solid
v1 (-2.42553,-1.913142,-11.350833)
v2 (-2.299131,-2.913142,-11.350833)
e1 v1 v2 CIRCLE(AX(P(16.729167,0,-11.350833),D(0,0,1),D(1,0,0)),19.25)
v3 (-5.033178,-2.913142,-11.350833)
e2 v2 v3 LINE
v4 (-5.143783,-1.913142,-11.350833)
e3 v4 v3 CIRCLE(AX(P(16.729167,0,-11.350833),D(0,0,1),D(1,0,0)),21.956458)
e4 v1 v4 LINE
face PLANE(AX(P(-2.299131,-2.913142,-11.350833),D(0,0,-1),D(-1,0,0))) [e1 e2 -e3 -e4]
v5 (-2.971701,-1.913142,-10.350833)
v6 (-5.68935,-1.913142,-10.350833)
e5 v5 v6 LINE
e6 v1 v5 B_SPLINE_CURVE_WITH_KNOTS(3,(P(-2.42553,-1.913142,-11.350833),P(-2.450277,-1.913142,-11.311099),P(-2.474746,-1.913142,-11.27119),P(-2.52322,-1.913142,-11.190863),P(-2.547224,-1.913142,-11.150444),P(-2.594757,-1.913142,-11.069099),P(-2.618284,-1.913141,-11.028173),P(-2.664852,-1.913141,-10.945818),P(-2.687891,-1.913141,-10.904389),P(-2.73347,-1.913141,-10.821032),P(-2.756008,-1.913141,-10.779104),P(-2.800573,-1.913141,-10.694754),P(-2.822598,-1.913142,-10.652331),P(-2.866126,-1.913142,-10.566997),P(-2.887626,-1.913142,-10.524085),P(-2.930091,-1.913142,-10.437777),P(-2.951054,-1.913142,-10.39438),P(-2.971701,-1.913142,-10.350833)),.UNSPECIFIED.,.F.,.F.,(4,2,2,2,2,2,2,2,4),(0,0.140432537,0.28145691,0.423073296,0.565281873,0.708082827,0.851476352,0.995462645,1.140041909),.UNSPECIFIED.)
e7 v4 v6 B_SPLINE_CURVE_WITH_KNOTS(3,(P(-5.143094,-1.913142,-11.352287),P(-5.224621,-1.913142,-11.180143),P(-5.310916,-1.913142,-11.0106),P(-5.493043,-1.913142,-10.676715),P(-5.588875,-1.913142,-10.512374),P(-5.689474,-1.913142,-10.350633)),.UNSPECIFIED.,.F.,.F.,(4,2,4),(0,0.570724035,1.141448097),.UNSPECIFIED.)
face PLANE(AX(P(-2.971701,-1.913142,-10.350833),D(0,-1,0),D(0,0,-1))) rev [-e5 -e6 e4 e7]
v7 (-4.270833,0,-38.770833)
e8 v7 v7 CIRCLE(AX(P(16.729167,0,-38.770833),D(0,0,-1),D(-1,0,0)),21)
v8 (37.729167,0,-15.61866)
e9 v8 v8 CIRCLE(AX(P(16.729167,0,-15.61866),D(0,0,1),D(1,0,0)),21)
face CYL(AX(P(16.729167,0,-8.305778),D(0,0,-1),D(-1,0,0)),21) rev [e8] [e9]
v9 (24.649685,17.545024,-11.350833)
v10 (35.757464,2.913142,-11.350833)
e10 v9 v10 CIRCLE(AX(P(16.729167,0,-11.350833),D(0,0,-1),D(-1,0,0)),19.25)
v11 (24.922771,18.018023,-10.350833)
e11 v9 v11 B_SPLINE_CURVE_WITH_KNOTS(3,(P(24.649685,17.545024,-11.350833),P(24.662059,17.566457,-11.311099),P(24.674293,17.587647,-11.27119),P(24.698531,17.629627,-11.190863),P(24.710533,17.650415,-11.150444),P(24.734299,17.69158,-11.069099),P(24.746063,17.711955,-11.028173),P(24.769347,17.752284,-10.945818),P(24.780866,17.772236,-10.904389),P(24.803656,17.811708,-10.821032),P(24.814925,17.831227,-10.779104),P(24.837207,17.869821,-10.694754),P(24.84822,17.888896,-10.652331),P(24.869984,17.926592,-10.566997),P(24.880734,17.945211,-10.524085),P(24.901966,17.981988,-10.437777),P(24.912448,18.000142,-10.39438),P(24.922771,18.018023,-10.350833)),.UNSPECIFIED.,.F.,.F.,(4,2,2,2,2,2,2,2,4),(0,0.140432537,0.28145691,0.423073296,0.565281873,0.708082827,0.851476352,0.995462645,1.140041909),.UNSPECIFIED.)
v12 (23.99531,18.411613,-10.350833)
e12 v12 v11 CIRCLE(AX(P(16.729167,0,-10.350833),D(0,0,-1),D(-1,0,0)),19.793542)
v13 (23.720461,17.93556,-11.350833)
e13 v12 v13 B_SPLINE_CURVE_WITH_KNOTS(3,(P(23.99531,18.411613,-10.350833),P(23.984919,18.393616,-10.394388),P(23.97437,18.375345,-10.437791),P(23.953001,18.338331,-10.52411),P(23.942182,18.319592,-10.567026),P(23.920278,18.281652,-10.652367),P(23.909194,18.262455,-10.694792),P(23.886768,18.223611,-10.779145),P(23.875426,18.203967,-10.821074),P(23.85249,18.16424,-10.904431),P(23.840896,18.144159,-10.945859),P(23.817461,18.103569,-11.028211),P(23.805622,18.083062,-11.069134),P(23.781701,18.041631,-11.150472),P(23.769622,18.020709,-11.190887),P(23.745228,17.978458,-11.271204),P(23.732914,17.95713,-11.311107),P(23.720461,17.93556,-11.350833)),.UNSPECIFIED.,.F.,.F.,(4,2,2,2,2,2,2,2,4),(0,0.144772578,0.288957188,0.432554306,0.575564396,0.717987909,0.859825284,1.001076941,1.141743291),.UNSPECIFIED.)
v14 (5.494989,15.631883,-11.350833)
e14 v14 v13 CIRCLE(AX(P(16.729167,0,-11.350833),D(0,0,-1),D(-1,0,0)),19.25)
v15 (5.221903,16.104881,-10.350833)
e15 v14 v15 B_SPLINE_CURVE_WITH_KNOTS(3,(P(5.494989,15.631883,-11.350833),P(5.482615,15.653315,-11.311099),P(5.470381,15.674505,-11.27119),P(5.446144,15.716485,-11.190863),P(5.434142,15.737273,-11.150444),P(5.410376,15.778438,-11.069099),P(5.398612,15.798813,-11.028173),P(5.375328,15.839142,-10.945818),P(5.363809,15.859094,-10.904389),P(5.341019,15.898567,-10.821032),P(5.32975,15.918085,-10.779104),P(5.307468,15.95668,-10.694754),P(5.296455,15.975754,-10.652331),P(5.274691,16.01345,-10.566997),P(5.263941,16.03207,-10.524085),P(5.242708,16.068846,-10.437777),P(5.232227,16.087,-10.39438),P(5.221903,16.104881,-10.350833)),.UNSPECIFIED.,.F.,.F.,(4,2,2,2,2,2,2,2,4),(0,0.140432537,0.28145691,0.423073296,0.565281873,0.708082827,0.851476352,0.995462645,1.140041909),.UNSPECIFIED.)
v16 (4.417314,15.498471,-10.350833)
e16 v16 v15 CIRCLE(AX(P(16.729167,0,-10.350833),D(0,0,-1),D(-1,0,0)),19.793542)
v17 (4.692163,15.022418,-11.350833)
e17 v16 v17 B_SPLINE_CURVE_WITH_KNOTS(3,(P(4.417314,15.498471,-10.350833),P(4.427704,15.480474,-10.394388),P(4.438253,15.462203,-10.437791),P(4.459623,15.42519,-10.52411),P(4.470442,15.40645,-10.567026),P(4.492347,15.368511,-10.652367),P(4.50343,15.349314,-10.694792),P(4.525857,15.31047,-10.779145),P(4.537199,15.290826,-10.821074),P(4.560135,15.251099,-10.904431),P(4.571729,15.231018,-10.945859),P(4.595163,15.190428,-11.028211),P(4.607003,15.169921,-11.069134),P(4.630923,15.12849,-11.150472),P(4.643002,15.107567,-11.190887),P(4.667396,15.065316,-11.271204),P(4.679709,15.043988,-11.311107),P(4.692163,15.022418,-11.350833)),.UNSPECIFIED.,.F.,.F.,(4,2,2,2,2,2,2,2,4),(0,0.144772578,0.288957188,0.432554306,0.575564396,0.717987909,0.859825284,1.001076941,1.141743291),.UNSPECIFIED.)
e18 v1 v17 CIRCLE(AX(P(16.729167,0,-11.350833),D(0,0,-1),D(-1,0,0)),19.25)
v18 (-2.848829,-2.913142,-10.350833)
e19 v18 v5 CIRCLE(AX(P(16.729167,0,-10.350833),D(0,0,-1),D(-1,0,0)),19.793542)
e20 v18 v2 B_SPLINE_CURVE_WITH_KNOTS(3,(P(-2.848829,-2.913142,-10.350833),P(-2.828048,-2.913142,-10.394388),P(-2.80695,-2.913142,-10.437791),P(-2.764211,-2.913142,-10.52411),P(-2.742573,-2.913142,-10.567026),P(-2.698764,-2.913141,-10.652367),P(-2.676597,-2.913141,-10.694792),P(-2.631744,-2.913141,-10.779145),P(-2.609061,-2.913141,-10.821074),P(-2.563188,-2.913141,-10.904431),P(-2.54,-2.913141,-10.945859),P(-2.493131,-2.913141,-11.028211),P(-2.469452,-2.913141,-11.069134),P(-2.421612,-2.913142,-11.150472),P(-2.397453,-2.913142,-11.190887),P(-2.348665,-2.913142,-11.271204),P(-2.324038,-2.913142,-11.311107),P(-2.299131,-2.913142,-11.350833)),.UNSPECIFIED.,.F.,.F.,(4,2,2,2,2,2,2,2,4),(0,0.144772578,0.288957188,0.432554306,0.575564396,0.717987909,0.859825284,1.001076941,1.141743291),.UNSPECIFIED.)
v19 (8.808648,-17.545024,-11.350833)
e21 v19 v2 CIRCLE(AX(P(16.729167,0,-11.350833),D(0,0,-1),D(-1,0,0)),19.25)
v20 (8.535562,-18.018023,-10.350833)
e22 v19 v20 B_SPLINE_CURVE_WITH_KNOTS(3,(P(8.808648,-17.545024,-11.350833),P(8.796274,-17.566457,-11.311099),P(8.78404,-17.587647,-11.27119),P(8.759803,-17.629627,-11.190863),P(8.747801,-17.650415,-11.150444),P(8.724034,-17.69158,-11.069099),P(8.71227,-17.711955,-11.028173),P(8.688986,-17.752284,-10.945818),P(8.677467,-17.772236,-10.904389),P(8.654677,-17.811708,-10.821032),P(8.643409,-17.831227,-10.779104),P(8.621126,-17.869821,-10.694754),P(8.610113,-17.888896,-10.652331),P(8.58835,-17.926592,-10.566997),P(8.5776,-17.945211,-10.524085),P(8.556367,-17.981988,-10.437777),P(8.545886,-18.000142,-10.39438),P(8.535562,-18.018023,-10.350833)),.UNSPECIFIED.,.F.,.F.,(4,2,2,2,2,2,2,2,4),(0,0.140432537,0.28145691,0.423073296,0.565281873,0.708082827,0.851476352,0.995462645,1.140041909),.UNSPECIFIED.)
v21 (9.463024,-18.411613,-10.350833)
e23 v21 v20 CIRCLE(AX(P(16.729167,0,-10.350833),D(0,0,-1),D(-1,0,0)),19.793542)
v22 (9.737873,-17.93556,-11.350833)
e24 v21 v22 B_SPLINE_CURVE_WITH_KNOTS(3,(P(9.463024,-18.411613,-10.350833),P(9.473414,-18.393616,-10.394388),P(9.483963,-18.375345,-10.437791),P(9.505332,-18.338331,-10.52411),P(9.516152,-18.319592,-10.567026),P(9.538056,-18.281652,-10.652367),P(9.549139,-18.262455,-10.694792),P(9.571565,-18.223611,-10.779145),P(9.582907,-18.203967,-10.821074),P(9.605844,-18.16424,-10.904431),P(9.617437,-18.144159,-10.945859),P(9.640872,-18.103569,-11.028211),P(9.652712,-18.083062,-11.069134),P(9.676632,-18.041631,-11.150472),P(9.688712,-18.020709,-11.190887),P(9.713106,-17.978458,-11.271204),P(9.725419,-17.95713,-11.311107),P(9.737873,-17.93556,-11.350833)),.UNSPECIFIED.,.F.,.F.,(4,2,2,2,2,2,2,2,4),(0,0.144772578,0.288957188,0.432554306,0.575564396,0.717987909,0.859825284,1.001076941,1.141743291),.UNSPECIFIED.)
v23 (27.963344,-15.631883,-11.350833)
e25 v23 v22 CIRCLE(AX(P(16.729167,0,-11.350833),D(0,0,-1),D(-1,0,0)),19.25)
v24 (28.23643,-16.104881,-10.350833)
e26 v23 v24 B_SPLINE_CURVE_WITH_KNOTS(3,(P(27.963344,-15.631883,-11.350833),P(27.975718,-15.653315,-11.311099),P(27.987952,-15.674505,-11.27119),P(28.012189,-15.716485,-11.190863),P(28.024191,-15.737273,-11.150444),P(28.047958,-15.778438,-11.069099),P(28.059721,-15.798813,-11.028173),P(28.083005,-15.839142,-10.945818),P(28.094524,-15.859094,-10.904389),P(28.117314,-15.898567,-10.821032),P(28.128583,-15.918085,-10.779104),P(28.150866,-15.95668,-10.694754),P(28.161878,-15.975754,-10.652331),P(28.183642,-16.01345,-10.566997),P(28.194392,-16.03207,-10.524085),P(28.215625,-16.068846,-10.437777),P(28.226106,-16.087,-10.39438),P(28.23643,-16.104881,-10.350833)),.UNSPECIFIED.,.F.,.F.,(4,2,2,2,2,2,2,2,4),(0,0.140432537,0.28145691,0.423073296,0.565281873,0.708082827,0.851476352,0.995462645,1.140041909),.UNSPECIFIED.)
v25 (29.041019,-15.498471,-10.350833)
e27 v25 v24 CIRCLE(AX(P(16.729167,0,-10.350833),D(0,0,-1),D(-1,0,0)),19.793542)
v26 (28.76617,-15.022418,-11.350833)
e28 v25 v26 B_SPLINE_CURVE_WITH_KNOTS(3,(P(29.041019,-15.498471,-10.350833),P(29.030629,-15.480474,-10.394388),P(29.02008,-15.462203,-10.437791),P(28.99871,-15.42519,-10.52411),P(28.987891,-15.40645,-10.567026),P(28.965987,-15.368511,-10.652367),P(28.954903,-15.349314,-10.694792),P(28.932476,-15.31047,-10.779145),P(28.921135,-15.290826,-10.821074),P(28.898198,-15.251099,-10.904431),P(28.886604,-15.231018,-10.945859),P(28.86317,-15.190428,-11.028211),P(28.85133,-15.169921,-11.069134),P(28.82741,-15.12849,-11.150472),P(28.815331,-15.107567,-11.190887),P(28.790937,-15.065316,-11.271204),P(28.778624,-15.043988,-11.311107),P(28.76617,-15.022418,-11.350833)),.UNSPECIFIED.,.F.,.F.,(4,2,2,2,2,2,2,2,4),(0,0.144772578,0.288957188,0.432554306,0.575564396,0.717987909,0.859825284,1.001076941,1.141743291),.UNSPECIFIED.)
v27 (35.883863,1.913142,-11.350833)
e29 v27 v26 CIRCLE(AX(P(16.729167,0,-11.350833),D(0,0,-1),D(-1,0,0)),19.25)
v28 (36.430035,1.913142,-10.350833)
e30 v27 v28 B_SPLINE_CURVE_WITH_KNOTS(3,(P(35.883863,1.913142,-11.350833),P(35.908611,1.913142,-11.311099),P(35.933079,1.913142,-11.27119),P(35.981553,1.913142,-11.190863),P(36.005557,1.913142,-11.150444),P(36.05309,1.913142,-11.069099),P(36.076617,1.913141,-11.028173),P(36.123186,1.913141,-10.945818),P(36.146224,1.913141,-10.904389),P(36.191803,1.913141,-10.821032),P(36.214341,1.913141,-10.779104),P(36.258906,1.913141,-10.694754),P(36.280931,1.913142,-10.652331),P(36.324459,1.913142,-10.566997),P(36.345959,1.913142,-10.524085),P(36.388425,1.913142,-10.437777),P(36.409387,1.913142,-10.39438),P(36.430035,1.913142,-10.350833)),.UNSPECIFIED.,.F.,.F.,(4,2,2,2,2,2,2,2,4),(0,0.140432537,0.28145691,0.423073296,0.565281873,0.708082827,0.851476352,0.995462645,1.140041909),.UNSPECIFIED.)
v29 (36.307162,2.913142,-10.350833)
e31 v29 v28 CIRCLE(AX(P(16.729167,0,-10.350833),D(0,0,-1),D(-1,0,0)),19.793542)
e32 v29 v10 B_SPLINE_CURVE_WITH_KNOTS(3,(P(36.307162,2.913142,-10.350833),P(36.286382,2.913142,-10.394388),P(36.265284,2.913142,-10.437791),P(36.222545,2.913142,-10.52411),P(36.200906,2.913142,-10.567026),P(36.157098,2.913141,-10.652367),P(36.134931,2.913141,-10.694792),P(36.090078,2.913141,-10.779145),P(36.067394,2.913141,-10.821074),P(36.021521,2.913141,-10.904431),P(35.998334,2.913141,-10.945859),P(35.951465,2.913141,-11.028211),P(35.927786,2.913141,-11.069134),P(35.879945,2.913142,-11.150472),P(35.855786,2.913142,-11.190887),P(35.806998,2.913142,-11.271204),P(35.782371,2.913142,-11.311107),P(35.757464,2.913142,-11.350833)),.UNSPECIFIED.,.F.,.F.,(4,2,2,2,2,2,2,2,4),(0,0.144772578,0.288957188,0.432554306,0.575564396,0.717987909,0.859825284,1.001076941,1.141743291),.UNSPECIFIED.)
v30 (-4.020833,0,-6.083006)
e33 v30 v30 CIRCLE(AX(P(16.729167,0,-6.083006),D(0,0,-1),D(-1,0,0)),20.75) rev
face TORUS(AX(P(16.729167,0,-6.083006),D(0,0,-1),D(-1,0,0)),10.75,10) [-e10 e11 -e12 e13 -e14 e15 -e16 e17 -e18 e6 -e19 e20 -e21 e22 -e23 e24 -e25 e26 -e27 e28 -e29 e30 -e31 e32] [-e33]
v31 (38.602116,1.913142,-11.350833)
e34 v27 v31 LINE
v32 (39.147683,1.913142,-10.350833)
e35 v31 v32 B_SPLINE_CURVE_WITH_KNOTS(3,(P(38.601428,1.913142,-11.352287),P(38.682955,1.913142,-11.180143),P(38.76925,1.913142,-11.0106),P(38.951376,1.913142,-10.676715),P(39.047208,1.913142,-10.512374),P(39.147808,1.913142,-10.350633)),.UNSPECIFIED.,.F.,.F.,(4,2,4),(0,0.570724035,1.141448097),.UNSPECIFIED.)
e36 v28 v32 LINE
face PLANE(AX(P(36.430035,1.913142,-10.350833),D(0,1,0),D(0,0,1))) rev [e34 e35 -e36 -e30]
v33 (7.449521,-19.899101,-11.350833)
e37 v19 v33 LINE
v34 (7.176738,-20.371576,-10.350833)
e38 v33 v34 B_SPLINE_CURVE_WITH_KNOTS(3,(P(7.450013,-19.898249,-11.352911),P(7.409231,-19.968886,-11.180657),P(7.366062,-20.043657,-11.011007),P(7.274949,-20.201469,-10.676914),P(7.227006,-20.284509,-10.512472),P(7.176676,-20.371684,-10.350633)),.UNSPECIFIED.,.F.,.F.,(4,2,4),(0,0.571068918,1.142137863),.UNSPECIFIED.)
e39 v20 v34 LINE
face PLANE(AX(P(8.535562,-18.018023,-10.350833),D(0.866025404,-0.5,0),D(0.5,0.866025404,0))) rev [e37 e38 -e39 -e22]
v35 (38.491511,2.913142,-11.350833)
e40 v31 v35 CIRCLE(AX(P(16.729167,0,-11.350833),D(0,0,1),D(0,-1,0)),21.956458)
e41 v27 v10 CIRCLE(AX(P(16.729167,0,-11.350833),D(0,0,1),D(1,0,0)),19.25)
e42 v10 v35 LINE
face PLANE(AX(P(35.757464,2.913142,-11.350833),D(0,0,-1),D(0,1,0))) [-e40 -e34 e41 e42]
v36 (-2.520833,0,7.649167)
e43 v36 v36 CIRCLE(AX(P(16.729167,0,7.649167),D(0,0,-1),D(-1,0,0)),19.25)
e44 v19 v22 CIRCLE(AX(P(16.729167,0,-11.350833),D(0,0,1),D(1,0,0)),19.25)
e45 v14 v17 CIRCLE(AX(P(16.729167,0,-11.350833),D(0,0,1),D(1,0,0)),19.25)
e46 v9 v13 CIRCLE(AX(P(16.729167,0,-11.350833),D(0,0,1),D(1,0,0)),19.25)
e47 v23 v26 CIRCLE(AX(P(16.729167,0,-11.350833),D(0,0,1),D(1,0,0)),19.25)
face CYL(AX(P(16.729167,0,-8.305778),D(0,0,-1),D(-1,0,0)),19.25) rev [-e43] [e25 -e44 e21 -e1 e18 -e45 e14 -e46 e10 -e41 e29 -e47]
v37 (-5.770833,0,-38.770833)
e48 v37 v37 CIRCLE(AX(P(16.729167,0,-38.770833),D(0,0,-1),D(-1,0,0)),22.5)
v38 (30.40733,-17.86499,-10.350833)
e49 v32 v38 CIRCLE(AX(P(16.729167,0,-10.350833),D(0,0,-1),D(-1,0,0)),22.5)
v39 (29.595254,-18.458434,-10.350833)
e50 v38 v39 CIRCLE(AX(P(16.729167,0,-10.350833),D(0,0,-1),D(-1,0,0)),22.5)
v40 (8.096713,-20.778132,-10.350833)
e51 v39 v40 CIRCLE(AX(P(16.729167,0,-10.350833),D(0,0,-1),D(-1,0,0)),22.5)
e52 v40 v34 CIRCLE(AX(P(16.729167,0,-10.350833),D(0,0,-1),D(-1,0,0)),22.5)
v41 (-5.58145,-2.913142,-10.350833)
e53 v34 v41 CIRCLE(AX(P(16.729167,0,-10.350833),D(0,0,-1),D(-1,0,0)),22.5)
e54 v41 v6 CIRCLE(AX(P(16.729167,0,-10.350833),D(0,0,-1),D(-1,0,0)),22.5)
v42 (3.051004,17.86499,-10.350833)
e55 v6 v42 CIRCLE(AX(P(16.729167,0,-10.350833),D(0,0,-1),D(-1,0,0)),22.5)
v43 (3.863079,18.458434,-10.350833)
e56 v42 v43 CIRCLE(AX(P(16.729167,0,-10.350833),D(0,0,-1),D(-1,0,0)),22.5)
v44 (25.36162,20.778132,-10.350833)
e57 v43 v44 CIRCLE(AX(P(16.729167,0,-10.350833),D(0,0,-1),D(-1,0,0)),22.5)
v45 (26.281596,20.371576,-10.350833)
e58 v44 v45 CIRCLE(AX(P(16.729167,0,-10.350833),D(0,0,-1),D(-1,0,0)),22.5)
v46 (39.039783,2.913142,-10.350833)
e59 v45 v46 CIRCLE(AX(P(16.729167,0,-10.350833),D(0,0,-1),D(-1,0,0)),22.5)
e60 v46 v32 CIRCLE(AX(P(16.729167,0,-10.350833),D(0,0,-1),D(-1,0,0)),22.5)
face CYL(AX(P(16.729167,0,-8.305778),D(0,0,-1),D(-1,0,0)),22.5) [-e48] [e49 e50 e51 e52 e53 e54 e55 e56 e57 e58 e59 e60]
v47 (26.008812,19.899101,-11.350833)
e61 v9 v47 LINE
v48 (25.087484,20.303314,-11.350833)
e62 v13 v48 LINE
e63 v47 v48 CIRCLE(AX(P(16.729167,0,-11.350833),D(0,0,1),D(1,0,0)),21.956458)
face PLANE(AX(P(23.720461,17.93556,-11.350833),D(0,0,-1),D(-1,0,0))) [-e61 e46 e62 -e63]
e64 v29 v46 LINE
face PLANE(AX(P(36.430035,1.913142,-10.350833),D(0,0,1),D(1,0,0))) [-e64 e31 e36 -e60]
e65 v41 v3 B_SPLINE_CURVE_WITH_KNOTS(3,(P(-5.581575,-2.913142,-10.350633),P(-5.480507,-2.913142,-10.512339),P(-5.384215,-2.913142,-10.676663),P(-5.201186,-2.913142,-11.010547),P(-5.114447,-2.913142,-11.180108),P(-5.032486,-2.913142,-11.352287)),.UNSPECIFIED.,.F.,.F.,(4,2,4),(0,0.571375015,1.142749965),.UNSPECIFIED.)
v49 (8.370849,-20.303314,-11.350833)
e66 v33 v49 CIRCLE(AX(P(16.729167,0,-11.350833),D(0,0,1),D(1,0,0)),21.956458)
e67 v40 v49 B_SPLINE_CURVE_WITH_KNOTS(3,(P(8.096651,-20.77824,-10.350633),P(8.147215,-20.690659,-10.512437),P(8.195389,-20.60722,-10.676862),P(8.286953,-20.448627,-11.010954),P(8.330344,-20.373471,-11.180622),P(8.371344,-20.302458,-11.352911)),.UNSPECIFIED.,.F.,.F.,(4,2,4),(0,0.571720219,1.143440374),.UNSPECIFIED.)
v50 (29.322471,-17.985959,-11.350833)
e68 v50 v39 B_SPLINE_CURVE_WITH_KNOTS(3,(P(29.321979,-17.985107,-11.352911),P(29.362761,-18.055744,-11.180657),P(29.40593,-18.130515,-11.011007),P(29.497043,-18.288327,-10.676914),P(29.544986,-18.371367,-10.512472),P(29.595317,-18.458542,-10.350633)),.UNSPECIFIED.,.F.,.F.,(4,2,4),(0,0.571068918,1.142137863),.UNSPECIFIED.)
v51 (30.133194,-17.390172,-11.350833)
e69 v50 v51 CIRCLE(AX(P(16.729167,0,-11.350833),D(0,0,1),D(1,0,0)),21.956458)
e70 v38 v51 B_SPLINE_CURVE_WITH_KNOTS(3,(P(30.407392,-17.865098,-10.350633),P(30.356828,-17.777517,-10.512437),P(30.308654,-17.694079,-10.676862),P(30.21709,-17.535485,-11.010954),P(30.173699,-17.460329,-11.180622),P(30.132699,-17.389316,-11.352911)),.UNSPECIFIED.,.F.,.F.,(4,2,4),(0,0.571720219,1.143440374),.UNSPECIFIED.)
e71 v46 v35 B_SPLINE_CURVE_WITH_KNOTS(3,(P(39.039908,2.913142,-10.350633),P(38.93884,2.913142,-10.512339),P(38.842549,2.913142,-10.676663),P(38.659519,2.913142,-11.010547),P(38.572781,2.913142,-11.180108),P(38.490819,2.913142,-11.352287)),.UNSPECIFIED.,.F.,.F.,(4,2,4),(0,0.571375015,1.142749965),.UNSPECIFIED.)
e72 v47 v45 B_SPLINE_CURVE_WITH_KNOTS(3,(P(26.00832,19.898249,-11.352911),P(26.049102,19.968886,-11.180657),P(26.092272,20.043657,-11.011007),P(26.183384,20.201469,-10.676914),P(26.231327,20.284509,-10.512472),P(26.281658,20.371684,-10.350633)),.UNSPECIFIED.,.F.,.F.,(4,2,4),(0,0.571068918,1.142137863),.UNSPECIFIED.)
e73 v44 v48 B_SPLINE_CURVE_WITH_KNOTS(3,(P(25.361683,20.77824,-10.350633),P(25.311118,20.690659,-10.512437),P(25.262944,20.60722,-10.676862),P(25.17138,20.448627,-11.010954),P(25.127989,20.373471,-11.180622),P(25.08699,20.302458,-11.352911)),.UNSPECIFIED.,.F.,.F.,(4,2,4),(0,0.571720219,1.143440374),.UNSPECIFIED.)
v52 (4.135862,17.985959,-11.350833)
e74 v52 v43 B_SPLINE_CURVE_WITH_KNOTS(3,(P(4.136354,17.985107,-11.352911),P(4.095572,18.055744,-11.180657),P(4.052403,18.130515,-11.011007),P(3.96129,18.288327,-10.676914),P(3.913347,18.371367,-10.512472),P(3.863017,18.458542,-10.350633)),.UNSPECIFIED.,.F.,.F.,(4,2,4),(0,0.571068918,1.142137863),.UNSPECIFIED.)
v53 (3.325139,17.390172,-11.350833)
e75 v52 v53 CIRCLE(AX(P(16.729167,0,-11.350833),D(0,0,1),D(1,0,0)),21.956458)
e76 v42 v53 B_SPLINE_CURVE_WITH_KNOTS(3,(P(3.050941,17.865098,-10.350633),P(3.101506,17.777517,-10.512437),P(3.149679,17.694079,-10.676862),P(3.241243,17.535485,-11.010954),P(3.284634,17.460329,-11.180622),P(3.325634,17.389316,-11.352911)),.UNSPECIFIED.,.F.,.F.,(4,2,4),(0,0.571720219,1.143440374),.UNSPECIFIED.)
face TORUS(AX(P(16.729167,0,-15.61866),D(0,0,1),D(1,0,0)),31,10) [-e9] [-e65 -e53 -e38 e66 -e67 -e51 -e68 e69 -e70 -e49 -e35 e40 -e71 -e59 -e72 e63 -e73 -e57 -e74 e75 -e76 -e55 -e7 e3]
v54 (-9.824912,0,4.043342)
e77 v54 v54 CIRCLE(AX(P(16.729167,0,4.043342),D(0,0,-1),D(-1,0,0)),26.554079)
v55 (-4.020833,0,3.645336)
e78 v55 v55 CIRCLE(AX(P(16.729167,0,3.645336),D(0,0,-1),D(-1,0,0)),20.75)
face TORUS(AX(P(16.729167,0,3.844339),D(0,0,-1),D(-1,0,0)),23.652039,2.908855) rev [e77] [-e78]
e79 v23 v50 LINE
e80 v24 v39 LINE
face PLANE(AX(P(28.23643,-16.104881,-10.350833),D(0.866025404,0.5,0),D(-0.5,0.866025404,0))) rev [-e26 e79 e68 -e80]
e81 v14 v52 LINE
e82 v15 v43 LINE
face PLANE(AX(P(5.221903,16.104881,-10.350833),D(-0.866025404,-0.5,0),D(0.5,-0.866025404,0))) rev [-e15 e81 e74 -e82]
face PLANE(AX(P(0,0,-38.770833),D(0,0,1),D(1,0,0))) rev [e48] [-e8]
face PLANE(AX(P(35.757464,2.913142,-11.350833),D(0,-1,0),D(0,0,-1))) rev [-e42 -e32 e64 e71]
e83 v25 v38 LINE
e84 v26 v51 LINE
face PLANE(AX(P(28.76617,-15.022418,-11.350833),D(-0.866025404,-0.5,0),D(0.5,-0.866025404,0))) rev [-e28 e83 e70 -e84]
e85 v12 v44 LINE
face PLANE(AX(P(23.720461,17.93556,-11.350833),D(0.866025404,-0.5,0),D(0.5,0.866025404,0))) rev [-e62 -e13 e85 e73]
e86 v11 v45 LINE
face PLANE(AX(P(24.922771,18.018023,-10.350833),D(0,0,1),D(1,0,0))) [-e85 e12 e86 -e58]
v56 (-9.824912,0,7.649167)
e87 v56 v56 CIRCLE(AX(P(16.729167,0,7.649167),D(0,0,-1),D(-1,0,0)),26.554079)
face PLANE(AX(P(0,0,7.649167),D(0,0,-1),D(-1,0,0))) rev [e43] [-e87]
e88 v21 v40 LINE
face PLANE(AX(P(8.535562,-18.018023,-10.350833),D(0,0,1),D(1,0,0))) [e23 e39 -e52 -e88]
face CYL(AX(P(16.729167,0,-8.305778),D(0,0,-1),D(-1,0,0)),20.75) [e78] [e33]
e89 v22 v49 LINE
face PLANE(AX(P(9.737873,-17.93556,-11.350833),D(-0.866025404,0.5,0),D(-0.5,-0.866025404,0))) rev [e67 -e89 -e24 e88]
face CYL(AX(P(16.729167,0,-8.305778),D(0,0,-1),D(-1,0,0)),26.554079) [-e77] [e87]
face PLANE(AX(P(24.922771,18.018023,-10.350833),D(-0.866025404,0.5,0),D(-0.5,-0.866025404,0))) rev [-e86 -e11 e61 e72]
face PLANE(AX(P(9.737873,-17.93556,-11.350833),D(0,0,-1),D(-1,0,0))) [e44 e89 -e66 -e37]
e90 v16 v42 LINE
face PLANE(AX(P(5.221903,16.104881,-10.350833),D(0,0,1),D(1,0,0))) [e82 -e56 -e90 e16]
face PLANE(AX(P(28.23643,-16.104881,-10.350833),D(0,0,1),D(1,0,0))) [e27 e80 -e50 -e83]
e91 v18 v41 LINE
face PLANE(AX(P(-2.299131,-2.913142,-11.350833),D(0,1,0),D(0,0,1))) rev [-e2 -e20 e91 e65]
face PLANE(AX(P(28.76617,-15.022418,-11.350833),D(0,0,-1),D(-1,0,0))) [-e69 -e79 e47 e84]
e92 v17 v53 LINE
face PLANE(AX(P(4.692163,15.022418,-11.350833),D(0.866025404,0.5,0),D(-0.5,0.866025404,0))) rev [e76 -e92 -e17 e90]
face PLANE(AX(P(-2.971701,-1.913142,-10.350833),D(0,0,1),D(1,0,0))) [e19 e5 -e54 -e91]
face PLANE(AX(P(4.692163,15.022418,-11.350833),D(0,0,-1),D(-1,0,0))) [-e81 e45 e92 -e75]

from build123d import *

# Parameters (mm, degrees)
SKETCH2_W           = 1.5
SKETCH2_H           = 28.42
FILLET1_R           = 10
FILLET2_R           = 10
BOSS_EXTRUDE4_START = -11.350833333
BOSS_EXTRUDE4_DEPTH = 1
CIRPATTERN2_COUNT   = 6


with BuildPart() as part:
    # Sketch2 → Revolve1 (revolve)
    with BuildSketch(Plane(origin=(0, 0, 0), x_dir=(1, 0, 0), z_dir=(0, 1, 0))):
        with Locations((-5.020833333, 24.560833333)):
            Rectangle(SKETCH2_W, SKETCH2_H)
        with BuildLine():
            Line((-2.520833333, 11.350833333), (-4.020833333, 11.350833333))
            Line((-4.020833333, 11.350833333), (-4.020833333, -3.645335915))
            ThreePointArc((-4.020833333, -3.645335915), (-4.014018155, -3.844339123), (-4.020833333, -4.043342332))
            Line((-4.020833333, -4.043342332), (-4.020833333, -5.649166667))
            Line((-4.020833333, -5.649166667), (-2.520833333, -5.649166667))
            Line((-2.520833333, -5.649166667), (-2.520833333, 11.350833333))
        make_face()
        with BuildLine():
            Line((-2.520833333, -7.649166667), (-2.520833333, -5.649166667))
            Line((-2.520833333, -5.649166667), (-4.020833333, -5.649166667))
            Line((-4.020833333, -5.649166667), (-4.641637876, -5.649166667))
            ThreePointArc((-4.641637876, -5.649166667), (-6.922872715, -6.753193683), (-9.204107554, -5.649166667))
            Line((-9.204107554, -5.649166667), (-9.824912097, -5.649166667))
            Line((-9.824912097, -5.649166667), (-9.824912097, -7.649166667))
            Line((-9.824912097, -7.649166667), (-2.520833333, -7.649166667))
        make_face()
        with BuildLine():
            Line((-4.020833333, -5.649166667), (-4.020833333, -4.043342332))
            ThreePointArc((-4.020833333, -4.043342332), (-4.209710195, -4.893235682), (-4.641637876, -5.649166667))
            Line((-4.641637876, -5.649166667), (-4.020833333, -5.649166667))
        make_face()
        with BuildLine():
            Line((-9.824912097, -5.649166667), (-9.204107554, -5.649166667))
            ThreePointArc((-9.204107554, -5.649166667), (-9.636035235, -4.893235682), (-9.824912097, -4.043342332))
            Line((-9.824912097, -4.043342332), (-9.824912097, -5.649166667))
        make_face()
    revolve(axis=Axis((16.729166667, 0, -8.305777899), (0, 0, 1)))

    # Fillet1
    # the kernel refuses this fillet: 10 mm, written as the material it takes off along each edge
    with BuildSketch(Plane(origin=(16.729166667, 0, -10.350833333), x_dir=(-1, 0, 0), z_dir=(0, 1, 0))) as fillet1_piece_1:
        with BuildLine():
            CenterArc((31, -5.267826876), FILLET1_R, 148.211669383, 31.788330617)
            Line((22.5, 0), (22.33, 0.105356538))
            ThreePointArc((22.33, 0.105356538), (21.75, 0.2), (21, 0.2))
            Line((21, 0.2), (20.8, 0))
            Line((20.8, 0), (20.8, -5.267826876))
            Line((20.8, -5.267826876), (21, -5.267826876))
        make_face()
    revolve(axis=Axis((16.729166667, 0, -10.350833333), (0, 0, 1)), mode=Mode.SUBTRACT)

    # Fillet2
    # the kernel refuses this fillet: 10 mm, written as the material it takes off along each edge
    with BuildSketch(Plane(origin=(16.729166667, 0, -11.350833333), x_dir=(-1, 0, 0), z_dir=(0, 1, 0))) as fillet2_piece_1:
        with BuildLine():
            CenterArc((10.75, 5.267826876), FILLET2_R, 328.211669383, 31.788330617)
            Line((19.25, 0), (19.42, -0.105356538))
            ThreePointArc((19.42, -0.105356538), (20, -0.2), (20.75, -0.2))
            Line((20.75, -0.2), (20.95, 0))
            Line((20.95, 0), (20.95, 5.267826876))
            Line((20.95, 5.267826876), (20.75, 5.267826876))
        make_face()
    revolve(axis=Axis((16.729166667, 0, -11.350833333), (0, 0, 1)), mode=Mode.SUBTRACT)

    # Boss-Extrude4: read off the stored shape, not the designer's step
    # Boss-Extrude4 outline → Boss-Extrude4 (add)
    with BuildSketch(Plane.XY.offset(BOSS_EXTRUDE4_START)):
        with BuildLine():
            ThreePointArc((39.147683304, 1.913141856), (39.09932169, 2.413744857), (39.039783075, 2.913141856))
            Line((39.039783075, 2.913141856), (35.757464135, 2.913141856))
            ThreePointArc((35.757464135, 2.913141856), (35.827209818, 2.4139693), (35.883862912, 1.913141856))
            Line((35.883862912, 1.913141856), (39.147683304, 1.913141856))
        make_face()
    boss_extrude4 = extrude(amount=BOSS_EXTRUDE4_DEPTH)

    # CirPattern2: Boss-Extrude4 ×6 about axis
    cirpattern2_axis = Axis((16.729166667, 0, 0), (0, 0, 1))
    for i in range(1, CIRPATTERN2_COUNT):
        add(boss_extrude4.rotate(cirpattern2_axis, i * 360 / CIRPATTERN2_COUNT))


solid = part.part
